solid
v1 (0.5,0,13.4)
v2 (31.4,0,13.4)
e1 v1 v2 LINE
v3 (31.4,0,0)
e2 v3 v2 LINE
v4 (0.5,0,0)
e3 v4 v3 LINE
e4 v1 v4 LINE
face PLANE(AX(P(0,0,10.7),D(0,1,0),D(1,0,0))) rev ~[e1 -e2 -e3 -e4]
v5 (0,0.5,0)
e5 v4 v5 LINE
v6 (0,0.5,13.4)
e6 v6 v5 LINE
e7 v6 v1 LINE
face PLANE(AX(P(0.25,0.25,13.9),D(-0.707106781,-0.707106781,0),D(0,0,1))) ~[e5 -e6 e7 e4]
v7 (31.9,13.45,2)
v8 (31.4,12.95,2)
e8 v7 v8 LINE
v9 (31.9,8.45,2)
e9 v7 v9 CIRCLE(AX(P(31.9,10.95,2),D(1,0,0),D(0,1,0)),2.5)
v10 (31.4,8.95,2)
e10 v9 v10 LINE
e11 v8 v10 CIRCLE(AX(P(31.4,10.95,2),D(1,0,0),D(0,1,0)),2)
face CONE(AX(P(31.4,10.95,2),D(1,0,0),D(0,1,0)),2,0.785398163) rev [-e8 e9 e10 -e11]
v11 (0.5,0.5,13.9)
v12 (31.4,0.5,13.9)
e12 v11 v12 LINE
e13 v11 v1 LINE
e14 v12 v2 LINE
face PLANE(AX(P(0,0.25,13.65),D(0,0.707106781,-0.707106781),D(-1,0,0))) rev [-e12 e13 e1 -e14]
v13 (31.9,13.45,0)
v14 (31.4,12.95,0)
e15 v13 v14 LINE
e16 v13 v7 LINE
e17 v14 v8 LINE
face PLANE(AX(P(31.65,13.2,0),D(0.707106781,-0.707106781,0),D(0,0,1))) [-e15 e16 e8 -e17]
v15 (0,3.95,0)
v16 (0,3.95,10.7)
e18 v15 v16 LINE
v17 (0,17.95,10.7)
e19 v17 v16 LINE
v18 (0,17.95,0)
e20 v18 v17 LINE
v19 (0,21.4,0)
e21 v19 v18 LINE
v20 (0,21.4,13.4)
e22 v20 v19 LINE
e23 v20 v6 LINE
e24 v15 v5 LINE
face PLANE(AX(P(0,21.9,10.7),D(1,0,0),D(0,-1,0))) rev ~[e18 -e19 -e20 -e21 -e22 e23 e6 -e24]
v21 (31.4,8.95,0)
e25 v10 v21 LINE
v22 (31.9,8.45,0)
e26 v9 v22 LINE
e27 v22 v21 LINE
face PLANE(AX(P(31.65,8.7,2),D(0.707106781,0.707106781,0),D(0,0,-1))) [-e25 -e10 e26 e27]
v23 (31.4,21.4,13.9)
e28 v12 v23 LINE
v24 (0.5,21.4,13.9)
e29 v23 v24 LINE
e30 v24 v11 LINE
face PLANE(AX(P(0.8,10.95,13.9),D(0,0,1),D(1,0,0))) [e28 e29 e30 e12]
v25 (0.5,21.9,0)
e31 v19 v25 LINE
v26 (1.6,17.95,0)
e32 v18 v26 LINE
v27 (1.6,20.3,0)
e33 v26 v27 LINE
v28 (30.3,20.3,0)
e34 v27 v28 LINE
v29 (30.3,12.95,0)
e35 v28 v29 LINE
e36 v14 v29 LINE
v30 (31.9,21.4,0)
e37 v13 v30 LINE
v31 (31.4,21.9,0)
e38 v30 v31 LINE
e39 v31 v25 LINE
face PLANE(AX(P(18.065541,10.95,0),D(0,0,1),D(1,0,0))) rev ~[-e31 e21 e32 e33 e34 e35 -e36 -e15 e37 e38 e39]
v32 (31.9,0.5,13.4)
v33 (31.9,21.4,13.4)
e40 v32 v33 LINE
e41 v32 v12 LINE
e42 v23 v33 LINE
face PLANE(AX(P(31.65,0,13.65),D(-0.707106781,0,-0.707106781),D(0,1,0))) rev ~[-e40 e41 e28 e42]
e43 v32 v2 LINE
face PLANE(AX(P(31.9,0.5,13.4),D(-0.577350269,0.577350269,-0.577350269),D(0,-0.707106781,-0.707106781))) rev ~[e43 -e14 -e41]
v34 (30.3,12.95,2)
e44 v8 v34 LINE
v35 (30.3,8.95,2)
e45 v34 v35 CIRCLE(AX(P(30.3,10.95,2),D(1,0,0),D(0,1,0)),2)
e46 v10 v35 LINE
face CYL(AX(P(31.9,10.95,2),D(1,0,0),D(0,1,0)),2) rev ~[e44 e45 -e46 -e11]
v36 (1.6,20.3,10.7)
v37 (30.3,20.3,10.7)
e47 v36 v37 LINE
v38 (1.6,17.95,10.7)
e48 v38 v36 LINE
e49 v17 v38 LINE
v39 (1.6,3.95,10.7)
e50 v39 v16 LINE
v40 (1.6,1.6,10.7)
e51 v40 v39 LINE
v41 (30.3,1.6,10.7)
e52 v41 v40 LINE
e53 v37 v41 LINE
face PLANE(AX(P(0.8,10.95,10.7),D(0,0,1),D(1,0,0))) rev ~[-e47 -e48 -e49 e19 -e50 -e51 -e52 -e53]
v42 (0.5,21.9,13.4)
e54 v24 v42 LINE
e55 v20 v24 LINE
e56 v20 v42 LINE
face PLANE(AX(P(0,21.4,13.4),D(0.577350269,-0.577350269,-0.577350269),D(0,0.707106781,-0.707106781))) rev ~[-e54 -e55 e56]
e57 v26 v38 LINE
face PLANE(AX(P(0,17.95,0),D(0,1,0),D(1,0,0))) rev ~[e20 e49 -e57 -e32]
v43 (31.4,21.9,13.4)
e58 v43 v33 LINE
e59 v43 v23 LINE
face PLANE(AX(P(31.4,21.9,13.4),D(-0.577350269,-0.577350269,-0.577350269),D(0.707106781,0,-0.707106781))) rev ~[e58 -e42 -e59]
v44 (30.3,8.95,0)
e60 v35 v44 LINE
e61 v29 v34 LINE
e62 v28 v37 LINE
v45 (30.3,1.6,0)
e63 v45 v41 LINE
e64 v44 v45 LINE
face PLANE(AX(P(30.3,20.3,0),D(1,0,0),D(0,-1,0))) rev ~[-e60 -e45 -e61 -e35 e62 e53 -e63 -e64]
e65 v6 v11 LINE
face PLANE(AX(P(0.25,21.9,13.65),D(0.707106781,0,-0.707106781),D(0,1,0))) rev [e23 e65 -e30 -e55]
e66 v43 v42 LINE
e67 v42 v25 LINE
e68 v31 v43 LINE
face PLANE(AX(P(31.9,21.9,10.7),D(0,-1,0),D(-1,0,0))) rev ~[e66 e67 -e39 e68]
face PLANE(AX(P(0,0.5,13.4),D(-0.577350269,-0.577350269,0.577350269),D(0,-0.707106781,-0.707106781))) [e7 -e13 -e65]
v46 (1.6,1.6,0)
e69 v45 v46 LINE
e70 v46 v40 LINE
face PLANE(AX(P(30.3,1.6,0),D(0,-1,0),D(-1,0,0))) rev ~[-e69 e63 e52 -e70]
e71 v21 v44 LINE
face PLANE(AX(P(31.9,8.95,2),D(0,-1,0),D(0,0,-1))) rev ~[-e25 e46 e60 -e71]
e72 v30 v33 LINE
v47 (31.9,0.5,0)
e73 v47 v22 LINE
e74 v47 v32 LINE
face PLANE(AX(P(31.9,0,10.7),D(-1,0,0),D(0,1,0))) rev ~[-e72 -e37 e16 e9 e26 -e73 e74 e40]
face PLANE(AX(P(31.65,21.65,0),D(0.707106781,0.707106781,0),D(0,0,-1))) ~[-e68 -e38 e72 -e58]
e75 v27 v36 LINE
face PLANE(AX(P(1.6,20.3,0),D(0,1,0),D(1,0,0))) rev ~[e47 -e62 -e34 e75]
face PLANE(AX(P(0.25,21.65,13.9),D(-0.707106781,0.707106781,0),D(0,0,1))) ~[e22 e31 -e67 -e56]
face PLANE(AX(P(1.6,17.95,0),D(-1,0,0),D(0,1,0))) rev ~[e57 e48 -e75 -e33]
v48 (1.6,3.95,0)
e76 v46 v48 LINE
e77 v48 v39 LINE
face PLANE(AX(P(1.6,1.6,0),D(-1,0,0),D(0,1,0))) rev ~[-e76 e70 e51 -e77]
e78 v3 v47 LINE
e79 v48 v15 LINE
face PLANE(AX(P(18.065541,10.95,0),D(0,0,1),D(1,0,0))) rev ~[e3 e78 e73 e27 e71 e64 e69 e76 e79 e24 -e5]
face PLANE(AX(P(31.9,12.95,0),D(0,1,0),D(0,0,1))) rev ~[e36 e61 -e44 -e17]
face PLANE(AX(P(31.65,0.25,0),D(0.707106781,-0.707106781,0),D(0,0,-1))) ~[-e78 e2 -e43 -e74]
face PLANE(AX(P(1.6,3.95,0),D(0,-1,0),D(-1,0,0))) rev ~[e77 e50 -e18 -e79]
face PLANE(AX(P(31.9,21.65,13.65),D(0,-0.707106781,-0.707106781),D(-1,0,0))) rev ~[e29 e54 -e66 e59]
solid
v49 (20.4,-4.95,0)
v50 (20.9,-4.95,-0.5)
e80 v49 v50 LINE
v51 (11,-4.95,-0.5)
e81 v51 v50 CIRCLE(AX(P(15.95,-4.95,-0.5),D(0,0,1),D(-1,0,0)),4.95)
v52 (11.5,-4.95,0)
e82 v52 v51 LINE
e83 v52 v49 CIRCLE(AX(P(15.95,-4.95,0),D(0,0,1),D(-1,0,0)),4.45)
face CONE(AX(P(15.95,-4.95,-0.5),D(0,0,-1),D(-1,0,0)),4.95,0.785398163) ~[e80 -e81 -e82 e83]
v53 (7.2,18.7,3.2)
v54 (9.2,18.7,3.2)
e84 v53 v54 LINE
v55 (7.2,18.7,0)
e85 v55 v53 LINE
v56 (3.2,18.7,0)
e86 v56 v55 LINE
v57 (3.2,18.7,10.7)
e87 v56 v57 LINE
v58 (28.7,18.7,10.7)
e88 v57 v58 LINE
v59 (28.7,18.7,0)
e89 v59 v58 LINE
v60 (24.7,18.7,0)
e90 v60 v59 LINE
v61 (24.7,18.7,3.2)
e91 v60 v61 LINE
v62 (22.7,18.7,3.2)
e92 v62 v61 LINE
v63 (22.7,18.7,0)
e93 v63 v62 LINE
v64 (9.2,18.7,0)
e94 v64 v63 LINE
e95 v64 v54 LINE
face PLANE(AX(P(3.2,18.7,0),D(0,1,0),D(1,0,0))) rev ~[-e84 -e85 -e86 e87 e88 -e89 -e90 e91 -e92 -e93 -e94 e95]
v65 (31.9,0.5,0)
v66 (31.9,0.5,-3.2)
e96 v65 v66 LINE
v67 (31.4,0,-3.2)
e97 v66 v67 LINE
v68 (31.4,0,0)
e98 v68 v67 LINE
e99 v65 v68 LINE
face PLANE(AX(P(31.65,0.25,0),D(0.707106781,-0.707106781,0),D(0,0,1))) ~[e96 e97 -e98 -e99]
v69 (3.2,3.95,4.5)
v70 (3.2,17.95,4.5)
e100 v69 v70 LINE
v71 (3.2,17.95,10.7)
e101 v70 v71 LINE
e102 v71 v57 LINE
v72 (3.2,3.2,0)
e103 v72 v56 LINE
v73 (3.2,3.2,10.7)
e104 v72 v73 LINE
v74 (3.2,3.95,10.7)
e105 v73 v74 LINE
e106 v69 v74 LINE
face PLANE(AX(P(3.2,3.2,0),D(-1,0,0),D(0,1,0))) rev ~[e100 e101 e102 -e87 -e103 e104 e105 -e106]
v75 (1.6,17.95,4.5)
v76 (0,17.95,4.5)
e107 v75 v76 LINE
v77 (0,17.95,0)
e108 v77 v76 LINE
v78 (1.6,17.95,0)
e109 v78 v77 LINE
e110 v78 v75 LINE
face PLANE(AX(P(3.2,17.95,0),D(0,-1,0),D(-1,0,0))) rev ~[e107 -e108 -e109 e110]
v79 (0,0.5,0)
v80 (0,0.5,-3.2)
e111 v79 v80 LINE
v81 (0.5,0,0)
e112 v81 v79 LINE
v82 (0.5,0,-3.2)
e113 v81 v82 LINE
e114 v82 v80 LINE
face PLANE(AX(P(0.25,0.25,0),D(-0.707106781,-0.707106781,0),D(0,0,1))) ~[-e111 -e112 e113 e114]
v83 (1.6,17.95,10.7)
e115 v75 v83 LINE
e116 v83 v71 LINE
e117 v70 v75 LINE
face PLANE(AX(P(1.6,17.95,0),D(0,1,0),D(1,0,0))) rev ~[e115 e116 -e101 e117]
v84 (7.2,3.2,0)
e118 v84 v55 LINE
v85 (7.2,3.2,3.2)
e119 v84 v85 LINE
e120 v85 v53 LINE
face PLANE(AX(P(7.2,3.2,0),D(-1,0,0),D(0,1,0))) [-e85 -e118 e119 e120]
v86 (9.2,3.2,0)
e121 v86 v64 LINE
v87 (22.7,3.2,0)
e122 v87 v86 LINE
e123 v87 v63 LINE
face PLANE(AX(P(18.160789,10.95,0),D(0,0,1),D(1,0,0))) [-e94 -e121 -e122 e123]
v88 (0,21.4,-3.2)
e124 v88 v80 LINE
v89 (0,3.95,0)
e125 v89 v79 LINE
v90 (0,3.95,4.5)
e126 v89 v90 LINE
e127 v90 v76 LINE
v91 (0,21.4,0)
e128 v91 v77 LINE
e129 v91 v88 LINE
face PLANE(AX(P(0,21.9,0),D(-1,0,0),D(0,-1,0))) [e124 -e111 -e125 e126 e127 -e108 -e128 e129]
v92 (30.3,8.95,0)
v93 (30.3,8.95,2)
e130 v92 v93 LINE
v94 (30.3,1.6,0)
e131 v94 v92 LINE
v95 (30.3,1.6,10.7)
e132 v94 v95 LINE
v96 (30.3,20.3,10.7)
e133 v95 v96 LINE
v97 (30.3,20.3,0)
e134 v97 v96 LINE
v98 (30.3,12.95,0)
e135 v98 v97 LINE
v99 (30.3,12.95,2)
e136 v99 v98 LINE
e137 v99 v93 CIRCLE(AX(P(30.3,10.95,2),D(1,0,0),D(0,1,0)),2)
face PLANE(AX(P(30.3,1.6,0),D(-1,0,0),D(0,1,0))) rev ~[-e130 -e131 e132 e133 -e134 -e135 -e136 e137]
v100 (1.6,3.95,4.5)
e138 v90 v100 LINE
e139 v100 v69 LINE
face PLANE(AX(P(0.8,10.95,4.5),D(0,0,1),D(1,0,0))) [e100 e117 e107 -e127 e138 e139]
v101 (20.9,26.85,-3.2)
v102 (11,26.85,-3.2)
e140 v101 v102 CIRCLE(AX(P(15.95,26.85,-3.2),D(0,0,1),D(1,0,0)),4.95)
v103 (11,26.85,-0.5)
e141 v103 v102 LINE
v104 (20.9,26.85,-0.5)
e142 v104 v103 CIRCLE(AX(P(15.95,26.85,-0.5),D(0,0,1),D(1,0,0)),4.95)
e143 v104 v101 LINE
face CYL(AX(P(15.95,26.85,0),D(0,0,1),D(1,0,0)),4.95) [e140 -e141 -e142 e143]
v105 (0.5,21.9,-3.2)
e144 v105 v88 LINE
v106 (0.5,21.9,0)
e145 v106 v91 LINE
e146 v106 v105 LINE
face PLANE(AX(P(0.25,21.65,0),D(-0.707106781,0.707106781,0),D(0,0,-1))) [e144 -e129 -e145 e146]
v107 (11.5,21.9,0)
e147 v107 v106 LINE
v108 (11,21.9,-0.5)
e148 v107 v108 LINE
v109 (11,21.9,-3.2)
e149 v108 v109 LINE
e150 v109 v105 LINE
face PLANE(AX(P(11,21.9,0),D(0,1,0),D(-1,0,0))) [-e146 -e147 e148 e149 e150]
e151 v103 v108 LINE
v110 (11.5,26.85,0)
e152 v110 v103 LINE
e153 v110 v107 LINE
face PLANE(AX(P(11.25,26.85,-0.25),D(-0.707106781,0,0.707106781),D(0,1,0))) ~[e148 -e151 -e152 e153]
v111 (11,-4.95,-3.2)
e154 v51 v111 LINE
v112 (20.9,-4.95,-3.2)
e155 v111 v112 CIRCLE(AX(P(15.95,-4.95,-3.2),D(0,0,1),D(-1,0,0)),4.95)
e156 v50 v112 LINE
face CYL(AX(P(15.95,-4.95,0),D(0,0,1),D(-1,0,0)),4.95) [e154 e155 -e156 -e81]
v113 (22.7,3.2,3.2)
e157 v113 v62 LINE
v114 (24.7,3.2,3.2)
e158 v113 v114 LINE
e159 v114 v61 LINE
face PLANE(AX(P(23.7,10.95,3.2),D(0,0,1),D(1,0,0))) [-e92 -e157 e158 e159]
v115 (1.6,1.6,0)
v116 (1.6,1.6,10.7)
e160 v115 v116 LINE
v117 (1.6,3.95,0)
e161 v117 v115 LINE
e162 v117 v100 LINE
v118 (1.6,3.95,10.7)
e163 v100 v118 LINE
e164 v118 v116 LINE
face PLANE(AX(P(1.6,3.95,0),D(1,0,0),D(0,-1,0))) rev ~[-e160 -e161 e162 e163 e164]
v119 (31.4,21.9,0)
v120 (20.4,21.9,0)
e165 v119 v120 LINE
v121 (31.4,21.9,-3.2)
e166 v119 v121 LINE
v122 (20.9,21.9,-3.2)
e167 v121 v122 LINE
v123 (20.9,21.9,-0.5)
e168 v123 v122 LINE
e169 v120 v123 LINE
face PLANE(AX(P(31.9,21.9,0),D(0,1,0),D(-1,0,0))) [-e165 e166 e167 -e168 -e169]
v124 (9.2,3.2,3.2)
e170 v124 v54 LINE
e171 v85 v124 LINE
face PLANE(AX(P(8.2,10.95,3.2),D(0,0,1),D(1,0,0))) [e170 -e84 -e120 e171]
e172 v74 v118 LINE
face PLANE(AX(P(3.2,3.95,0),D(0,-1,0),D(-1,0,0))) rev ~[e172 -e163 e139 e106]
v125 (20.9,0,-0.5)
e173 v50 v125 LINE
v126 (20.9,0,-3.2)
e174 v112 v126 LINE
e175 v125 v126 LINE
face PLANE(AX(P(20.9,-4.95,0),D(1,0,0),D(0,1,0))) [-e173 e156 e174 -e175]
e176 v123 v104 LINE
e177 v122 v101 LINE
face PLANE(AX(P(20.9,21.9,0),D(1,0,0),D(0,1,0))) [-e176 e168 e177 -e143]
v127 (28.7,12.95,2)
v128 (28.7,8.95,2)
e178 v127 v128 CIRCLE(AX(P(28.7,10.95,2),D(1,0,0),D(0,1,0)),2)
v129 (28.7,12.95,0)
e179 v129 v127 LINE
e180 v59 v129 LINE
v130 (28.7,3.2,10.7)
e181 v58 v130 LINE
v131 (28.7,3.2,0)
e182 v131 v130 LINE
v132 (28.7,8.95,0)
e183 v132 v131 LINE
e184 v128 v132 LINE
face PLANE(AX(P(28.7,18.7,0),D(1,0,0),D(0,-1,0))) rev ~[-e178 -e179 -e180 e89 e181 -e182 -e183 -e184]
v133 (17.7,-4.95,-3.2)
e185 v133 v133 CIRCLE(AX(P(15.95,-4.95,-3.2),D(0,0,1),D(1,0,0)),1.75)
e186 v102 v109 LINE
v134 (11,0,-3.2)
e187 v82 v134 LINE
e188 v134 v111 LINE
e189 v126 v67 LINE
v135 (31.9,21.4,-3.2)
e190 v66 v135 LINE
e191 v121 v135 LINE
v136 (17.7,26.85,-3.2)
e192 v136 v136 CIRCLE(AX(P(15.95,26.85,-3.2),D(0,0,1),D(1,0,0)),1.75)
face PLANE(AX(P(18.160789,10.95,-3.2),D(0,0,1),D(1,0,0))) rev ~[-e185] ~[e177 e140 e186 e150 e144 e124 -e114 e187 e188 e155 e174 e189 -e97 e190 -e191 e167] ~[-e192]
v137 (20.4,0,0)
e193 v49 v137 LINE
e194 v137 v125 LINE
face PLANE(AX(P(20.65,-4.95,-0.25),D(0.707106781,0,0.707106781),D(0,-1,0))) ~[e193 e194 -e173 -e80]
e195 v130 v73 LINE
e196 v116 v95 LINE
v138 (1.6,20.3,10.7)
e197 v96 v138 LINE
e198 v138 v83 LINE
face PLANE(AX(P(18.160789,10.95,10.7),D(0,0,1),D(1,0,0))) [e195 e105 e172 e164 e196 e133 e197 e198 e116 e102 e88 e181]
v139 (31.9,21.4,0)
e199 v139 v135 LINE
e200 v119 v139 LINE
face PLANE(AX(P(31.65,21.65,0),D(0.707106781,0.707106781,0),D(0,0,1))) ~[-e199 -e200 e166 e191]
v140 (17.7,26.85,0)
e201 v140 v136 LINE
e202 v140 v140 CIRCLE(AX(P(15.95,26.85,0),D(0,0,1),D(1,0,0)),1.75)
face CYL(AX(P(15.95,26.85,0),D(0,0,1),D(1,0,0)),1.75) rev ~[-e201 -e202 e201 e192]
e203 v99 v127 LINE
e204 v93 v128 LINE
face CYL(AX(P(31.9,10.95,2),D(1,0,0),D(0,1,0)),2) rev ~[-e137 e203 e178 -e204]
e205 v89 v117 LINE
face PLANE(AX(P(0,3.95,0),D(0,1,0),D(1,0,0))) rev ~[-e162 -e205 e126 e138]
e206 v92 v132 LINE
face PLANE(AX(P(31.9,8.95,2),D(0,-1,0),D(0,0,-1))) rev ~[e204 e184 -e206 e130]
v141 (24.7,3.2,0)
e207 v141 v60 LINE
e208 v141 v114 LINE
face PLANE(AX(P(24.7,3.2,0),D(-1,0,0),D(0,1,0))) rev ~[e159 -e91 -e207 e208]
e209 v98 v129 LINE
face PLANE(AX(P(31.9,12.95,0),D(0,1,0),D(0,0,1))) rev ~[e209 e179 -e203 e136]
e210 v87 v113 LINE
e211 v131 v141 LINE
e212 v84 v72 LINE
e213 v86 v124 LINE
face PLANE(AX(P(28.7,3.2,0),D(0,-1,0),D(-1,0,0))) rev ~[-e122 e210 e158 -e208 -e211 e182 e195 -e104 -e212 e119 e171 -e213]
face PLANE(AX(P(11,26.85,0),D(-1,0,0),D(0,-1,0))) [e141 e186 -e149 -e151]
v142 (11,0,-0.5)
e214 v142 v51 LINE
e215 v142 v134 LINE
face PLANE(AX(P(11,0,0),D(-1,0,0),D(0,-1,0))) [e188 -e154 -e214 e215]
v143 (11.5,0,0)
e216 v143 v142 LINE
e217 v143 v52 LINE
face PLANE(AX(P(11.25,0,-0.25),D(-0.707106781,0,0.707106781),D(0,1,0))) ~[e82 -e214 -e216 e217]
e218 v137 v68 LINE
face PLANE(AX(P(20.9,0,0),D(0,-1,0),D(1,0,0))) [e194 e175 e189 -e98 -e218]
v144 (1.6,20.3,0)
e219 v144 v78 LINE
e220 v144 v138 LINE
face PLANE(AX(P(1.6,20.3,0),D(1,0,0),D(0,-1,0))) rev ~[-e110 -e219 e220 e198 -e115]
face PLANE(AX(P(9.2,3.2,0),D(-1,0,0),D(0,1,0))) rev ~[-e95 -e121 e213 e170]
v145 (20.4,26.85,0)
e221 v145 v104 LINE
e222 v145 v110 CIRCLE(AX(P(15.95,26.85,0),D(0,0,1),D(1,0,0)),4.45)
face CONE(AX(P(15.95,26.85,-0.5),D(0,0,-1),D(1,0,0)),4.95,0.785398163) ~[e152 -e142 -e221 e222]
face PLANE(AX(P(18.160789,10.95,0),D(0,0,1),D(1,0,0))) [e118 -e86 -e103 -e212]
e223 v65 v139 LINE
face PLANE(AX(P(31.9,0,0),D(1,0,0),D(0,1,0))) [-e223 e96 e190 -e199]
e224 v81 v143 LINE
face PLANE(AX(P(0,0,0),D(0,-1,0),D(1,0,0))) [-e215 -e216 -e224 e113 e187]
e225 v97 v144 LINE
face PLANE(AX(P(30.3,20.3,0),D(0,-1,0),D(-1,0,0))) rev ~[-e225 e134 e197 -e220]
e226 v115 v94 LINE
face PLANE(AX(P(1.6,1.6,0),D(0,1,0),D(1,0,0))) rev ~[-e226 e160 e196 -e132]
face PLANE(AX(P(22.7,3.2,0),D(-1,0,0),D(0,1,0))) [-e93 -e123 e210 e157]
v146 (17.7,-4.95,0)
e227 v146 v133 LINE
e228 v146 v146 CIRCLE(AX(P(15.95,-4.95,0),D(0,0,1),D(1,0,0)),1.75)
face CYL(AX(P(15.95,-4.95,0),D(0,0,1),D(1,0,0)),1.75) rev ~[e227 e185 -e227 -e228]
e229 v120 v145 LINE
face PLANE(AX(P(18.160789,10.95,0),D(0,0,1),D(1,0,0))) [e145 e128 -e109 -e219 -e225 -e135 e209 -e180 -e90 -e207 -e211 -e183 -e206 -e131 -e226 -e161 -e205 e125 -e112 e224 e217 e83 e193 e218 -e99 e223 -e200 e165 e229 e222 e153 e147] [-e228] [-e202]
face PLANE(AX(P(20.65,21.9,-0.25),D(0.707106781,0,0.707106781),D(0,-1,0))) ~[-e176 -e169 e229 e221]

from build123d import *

# Parameters (mm, degrees)
F2_W       = 2
F2_H       = 15.5
F2_W_2     = 13.5
F2_W_3     = 1.6
F2_H_2     = 14
F2_W_4     = 4
F2_R       = 1.75
F3_DEPTH   = 3.2
F4_DEPTH   = 3.2
F5_DEPTH   = 4.5
F6_DEPTH   = 10.7
F7_DEPTH   = 10.7
F8_START   = 10.7
F8_DEPTH   = 3.2
F10_DEPTH  = 3.2
F11_SIZE   = 0.5
F11_2_SIZE = 0.5


with BuildPart() as f3:
    # F2 (on Top) → F3 (new body)
    with BuildSketch(Plane.XY):
        Polygon((7.2, 3.2), (3.2, 3.2), (3.2, 3.95), (1.6, 3.95), (1.6, 1.6), (30.3, 1.6), (30.3, 20.3), (1.6, 20.3), (1.6, 17.95), (3.2, 17.95), (3.2, 18.7), (7.2, 18.7), (9.2, 18.7), (22.7, 18.7), (24.7, 18.7), (28.7, 18.7), (28.7, 3.2), (24.7, 3.2), (22.7, 3.2), (9.2, 3.2), align=None)
        Polygon((3.2, 3.95), (3.2, 3.2), (7.2, 3.2), (7.2, 18.7), (3.2, 18.7), (3.2, 17.95), align=None)
        with Locations((23.7, 10.95)):
            Rectangle(F2_W, F2_H)
        with Locations((15.95, 10.95)):
            Rectangle(F2_W_2, F2_H)
        with Locations((2.4, 10.95)):
            Rectangle(F2_W_3, F2_H_2)
        with Locations((0.8, 10.95)):
            Rectangle(F2_W_3, F2_H_2)
        with Locations((26.7, 10.95)):
            Rectangle(F2_W_4, F2_H)
        with Locations((8.2, 10.95)):
            Rectangle(F2_W, F2_H)
        Polygon((1.6, 1.6), (1.6, 3.95), (0, 3.95), (0, 0), (11, 0), (20.9, 0), (31.9, 0), (31.9, 21.9), (20.9, 21.9), (11, 21.9), (0, 21.9), (0, 17.95), (1.6, 17.95), (1.6, 20.3), (30.3, 20.3), (30.3, 1.6), align=None)
        with BuildLine():
            Line((11, 26.85), (11, 21.9))
            Line((11, 21.9), (20.9, 21.9))
            Line((20.9, 21.9), (20.9, 26.85))
            ThreePointArc((20.9, 26.85), (15.95, 31.8), (11, 26.85))
        make_face()
        with Locations((15.95, 26.85)):
            Circle(F2_R, mode=Mode.SUBTRACT)
        with BuildLine():
            Line((20.9, 0), (11, 0))
            Line((11, 0), (11, -4.95))
            ThreePointArc((11, -4.95), (15.95, -9.9), (20.9, -4.95))
            Line((20.9, -4.95), (20.9, 0))
        make_face()
        with Locations((15.95, -4.95)):
            Circle(F2_R, mode=Mode.SUBTRACT)
    extrude(amount=-F3_DEPTH)

    # F2 (on Top) → F4 (join)
    with BuildSketch(Plane.XY):
        with Locations((8.2, 10.95)):
            Rectangle(F2_W, F2_H)
        with Locations((23.7, 10.95)):
            Rectangle(F2_W, F2_H)
    extrude(amount=F4_DEPTH)

    # F2 (on Top) → F5 (join)
    with BuildSketch(Plane.XY):
        with Locations((0.8, 10.95)):
            Rectangle(F2_W_3, F2_H_2)
        with Locations((2.4, 10.95)):
            Rectangle(F2_W_3, F2_H_2)
    extrude(amount=F5_DEPTH)

    # F2 (on Top) → F6 (join)
    with BuildSketch(Plane.XY):
        Polygon((7.2, 3.2), (3.2, 3.2), (3.2, 3.95), (1.6, 3.95), (1.6, 1.6), (30.3, 1.6), (30.3, 20.3), (1.6, 20.3), (1.6, 17.95), (3.2, 17.95), (3.2, 18.7), (7.2, 18.7), (9.2, 18.7), (22.7, 18.7), (24.7, 18.7), (28.7, 18.7), (28.7, 3.2), (24.7, 3.2), (22.7, 3.2), (9.2, 3.2), align=None)
    extrude(amount=F6_DEPTH)


with BuildPart() as f7:
    # F2 (on Top) → F7 (new body)
    with BuildSketch(Plane.XY):
        Polygon((1.6, 1.6), (1.6, 3.95), (0, 3.95), (0, 0), (11, 0), (20.9, 0), (31.9, 0), (31.9, 21.9), (20.9, 21.9), (11, 21.9), (0, 21.9), (0, 17.95), (1.6, 17.95), (1.6, 20.3), (30.3, 20.3), (30.3, 1.6), align=None)
    extrude(amount=F7_DEPTH)

    # F2 (on Top) → F8 (join)
    with BuildSketch(Plane.XY.offset(F8_START)):
        with Locations((0.8, 10.95)):
            Rectangle(F2_W_3, F2_H_2)
        Polygon((1.6, 1.6), (1.6, 3.95), (0, 3.95), (0, 0), (11, 0), (20.9, 0), (31.9, 0), (31.9, 21.9), (20.9, 21.9), (11, 21.9), (0, 21.9), (0, 17.95), (1.6, 17.95), (1.6, 20.3), (30.3, 20.3), (30.3, 1.6), align=None)
        with Locations((8.2, 10.95)):
            Rectangle(F2_W, F2_H)
        with Locations((15.95, 10.95)):
            Rectangle(F2_W_2, F2_H)
        with Locations((23.7, 10.95)):
            Rectangle(F2_W, F2_H)
        Polygon((7.2, 3.2), (3.2, 3.2), (3.2, 3.95), (1.6, 3.95), (1.6, 1.6), (30.3, 1.6), (30.3, 20.3), (1.6, 20.3), (1.6, 17.95), (3.2, 17.95), (3.2, 18.7), (7.2, 18.7), (9.2, 18.7), (22.7, 18.7), (24.7, 18.7), (28.7, 18.7), (28.7, 3.2), (24.7, 3.2), (22.7, 3.2), (9.2, 3.2), align=None)
        with Locations((26.7, 10.95)):
            Rectangle(F2_W_4, F2_H)
        Polygon((3.2, 3.95), (3.2, 3.2), (7.2, 3.2), (7.2, 18.7), (3.2, 18.7), (3.2, 17.95), align=None)
        with Locations((2.4, 10.95)):
            Rectangle(F2_W_3, F2_H_2)
    extrude(amount=F8_DEPTH)


with BuildPart() as f10_tool:
    # F9 (on face) → F10 (new body, through all)
    with BuildSketch(Plane.YZ.offset(31.9)):
        with BuildLine():
            Line((12.95, 0), (12.95, 2))
            ThreePointArc((12.95, 2), (10.95, 4), (8.95, 2))
            Line((8.95, 2), (8.95, 0))
            Line((8.95, 0), (12.95, 0))
        make_face()
    extrude(amount=-F10_DEPTH)


with BuildPart() as f3_1:
    add(f3.part)

    # F10: cut by f10_tool
    add(f10_tool.part, mode=Mode.SUBTRACT)

    # F11
    f11_edges = [f3_1.edges().sort_by_distance(p)[0] for p in [
        (0, 21.9, -1.6),
        (0, 0, -1.6),
        (31.9, 0, -1.6),
        (31.9, 21.9, -1.6),
        (15.95, 31.8, 0),
        (15.95, -9.9, 0),
        (11, 24.375, 0),
        (20.9, 24.375, 0),
        (20.9, -2.475, 0),
        (11, -2.475, 0),
    ]]
    chamfer(f11_edges, length=F11_SIZE)


with BuildPart() as f7_1:
    add(f7.part)

    # F10: cut by f10_tool
    add(f10_tool.part, mode=Mode.SUBTRACT)

    # F11#2
    f11_2_edges = [f7_1.edges().sort_by_distance(p)[0] for p in [
        (15.95, 0, 13.9),
        (31.9, 10.95, 13.9),
        (15.95, 21.9, 13.9),
        (0, 10.95, 13.9),
        (0, 21.9, 6.95),
        (0, 0, 6.95),
        (31.9, 0, 6.95),
        (31.9, 21.9, 6.95),
        (31.9, 12.95, 1),
        (31.9, 8.95, 1),
        (31.9, 10.95, 4),
    ]]
    chamfer(f11_2_edges, length=F11_2_SIZE)


solid = Compound([f3_1.part, f7_1.part])
